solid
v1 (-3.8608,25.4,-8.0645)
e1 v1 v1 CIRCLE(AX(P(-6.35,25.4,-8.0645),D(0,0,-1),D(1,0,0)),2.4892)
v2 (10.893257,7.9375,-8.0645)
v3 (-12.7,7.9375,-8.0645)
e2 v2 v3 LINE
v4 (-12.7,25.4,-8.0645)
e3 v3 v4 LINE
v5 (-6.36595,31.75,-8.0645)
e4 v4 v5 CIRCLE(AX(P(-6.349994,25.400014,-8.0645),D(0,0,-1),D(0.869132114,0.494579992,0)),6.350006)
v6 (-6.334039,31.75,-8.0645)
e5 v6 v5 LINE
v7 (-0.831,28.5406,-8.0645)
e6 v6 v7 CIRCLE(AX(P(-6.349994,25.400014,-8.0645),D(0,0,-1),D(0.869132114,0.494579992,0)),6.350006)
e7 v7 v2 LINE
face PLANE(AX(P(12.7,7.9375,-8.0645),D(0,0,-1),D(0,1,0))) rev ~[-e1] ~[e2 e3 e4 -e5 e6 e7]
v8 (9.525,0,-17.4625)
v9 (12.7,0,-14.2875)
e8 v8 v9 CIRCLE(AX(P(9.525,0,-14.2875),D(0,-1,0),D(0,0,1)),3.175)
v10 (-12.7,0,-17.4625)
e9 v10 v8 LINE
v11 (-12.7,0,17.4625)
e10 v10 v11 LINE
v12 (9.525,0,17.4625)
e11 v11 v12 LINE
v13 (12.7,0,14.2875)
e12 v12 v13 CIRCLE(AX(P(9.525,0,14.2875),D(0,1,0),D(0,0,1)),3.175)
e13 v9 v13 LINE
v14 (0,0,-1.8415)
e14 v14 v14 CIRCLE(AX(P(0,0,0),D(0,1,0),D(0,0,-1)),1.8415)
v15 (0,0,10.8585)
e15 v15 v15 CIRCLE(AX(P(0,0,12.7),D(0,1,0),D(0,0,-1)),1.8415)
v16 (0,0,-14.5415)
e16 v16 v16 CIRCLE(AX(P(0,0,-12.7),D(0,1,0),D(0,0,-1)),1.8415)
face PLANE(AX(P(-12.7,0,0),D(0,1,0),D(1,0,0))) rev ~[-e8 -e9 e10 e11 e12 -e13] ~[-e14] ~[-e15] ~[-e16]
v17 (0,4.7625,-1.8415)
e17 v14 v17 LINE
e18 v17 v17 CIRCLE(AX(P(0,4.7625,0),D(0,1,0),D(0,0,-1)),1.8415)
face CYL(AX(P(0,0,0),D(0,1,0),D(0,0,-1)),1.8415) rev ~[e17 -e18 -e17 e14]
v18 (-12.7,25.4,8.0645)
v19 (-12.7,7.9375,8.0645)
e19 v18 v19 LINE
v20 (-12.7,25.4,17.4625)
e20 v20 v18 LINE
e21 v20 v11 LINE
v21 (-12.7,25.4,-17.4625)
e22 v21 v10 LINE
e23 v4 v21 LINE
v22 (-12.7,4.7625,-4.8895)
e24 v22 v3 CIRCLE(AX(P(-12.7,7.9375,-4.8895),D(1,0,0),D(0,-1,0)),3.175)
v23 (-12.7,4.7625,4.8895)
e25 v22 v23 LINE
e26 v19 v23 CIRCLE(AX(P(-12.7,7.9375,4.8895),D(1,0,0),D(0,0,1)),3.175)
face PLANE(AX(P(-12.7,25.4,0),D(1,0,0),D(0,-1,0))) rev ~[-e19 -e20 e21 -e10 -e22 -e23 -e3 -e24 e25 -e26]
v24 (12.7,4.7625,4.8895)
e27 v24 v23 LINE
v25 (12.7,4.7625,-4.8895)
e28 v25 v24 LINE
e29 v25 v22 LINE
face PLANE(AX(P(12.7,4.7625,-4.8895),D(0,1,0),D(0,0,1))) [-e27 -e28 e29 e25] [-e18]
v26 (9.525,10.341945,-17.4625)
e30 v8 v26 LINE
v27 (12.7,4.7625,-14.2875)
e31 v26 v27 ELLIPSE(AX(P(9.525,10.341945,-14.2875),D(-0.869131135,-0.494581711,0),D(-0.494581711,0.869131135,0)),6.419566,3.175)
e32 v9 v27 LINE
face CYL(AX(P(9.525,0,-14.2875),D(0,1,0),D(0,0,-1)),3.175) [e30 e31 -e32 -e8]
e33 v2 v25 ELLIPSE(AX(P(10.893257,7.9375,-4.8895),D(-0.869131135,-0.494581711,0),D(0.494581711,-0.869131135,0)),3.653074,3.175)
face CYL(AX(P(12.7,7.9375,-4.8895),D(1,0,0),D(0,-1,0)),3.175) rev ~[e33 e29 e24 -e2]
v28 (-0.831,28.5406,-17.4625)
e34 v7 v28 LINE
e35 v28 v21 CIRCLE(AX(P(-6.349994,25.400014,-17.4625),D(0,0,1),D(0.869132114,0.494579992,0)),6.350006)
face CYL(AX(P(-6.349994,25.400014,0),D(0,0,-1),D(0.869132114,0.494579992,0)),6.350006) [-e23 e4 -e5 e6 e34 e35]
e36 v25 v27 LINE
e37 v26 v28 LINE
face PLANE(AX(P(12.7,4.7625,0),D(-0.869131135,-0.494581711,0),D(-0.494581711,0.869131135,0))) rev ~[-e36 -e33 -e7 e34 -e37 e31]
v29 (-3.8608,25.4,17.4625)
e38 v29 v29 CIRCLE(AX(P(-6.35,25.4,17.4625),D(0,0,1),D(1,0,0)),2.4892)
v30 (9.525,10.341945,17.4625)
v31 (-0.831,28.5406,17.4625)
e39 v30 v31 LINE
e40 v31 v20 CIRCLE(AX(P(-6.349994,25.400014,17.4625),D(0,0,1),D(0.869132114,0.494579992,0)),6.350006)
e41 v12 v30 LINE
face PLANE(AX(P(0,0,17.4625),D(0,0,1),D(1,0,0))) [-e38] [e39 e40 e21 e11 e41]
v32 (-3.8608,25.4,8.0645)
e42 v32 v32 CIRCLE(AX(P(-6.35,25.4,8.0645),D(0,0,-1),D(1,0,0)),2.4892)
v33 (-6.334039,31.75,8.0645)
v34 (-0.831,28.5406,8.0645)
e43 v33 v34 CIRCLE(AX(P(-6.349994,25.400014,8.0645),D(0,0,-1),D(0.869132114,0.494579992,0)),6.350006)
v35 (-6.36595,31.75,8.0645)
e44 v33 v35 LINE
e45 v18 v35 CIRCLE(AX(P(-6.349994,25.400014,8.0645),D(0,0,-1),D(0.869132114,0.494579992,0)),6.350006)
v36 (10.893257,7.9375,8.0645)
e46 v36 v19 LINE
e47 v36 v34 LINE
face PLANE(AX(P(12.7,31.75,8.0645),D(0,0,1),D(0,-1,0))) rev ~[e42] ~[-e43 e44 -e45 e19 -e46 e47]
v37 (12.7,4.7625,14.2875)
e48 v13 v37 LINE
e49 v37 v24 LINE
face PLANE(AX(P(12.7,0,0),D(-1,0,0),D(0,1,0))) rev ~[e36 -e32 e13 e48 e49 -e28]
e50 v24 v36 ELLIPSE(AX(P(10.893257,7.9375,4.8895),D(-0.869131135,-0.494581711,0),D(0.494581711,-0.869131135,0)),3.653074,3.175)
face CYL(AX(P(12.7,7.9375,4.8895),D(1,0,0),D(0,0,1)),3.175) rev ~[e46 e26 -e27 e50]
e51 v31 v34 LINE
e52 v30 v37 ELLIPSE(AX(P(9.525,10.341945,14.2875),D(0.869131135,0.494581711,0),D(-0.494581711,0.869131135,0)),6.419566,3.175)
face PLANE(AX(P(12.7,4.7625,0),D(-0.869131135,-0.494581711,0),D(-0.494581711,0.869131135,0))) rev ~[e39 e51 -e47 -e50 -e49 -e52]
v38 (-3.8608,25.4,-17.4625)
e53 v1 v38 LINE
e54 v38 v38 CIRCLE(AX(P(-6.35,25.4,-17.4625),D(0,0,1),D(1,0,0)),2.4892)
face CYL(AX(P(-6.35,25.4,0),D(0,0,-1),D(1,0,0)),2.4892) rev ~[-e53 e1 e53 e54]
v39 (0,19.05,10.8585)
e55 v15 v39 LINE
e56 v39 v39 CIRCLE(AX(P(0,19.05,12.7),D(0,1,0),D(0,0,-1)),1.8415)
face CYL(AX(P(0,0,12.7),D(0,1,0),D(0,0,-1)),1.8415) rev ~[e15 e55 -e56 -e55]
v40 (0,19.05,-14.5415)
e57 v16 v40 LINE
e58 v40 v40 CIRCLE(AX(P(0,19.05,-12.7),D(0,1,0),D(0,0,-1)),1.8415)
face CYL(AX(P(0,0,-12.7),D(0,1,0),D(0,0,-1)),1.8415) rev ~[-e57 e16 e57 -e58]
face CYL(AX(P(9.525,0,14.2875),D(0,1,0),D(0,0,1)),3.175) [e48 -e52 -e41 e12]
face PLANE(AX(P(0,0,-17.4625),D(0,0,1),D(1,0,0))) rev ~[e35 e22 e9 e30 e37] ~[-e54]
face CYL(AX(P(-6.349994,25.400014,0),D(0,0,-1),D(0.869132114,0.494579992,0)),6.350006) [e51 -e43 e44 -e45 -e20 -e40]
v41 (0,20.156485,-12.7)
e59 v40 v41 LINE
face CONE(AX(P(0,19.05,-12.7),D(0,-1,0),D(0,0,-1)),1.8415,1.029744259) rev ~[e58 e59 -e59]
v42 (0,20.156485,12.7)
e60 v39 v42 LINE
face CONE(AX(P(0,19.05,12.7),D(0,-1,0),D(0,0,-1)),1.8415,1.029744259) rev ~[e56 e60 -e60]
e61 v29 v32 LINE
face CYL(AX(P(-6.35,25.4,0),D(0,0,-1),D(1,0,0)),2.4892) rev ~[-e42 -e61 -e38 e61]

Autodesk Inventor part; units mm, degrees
ref_plane "YZ Plane" through (0, 0, 0) normal (1, 0, 0) x (0, 1, 0)
ref_plane "XZ Plane" through (0, 0, 0) normal (0, 1, 0) x (-1, 0, 0)
ref_plane "XY Plane" through (0, 0, 0) normal (0, 0, 1) x (1, 0, 0)
sketch "Sketch1" plane through (0, 0, 0) normal (0, 0, 1) x (1, 0, 0)
  line L0 (-12.7, 0) -> (12.7, 0)
  line L1 (12.7, 0) -> (12.7, 4.7625)
  line L2 (12.7, 4.7625) -> (-0.831, 28.5406)
  line L3 (-12.7, 25.4) -> (-12.7, 0)
  arc A0 (-0.831, 28.5406) -> (-12.7, 25.4) centre (-6.35, 25.4) ccw
  circle A1 centre (-6.35, 25.4) radius 2.4892
  point P0 (0, 0)
  point P1 (0, 0)
  dimension "d0" = 25.4
  dimension "d1" = 6.35
  dimension "d2" = 4.7625
  dimension "d3" = 25.4
  dimension "d4" = 4.9784
extrude "Extrusion1" add sketch "Sketch1" along normal mid plane 34.925
sketch "Sketch2" plane through (12.7, 0, 17.4625) normal (1, 0, 0) x (0, 0, -1)
  line L0 (34.925, 4.7625) -> (0, 4.7625) projected
  line L1 (9.398, 31.75) -> (9.398, 7.9375)
  line L2 (12.573, 4.7625) -> (22.352, 4.7625)
  line L3 (25.527, 7.9375) -> (25.527, 31.75)
  arc A0 (9.398, 7.9375) -> (12.573, 4.7625) centre (12.573, 7.9375) ccw
  arc A1 (22.352, 4.7625) -> (25.527, 7.9375) centre (22.352, 7.9375) ccw
  line L4 (0, 0) -> (34.925, 0) construction
  line L5 (34.925, 31.75) -> (0, 31.75) projected
  point P0 (17.4625, 0)
  point P1 (17.4625, 4.7625)
  point P2 (17.4625, 0)
  point P3 (12.573, 4.7625)
  point P4 (22.352, 4.7625)
  dimension "d7" = 3.175
  dimension "d8" = 16.129
extrude "Extrusion2" cut sketch "Sketch2" against normal through all
chamfer "Chamfer2" [suppressed]
chamfer "Chamfer3" [suppressed]
fillet "Fillet1" radius 3.175 2 edges at (12.7, 2.3813, 17.4625) (12.7, 2.3813, -17.4625)
sketch "Sketch3" plane through (-12.7, 0, -17.4625) normal (0, -1, 0) x (1, 0, 0)
  line L0 (12.7, 30.1625) -> (12.7, 4.7625) construction
  point P0 (12.7, 17.4625)
  point P1 (12.7, 17.4625)
  point P2 (12.7, 17.4625)
  dimension "d12" = 25.4
  dimension "d37" = 38.1
  dimension "d38" = 25.4
  dimension "d32" = 25.4
  dimension "d33" = 25.4
  dimension "d34" = 50.8
hole "Hole1" at (0, 0, -12.7) at (0, 0, 12.7) at (0, 0, 0) direction (0, 1, 0) diameter 3.683 depth 19.05 tip angle 118 thread size "10-24 UNC" class "2B" standard "ANSI Unified Screw Threads"
pattern_linear "Rectangular Pattern1" [suppressed]
equation "\"d32\" = d33"
properties part number "Cascade Pulley Block2 (WCP-0298)" material "Aluminum 6061"
